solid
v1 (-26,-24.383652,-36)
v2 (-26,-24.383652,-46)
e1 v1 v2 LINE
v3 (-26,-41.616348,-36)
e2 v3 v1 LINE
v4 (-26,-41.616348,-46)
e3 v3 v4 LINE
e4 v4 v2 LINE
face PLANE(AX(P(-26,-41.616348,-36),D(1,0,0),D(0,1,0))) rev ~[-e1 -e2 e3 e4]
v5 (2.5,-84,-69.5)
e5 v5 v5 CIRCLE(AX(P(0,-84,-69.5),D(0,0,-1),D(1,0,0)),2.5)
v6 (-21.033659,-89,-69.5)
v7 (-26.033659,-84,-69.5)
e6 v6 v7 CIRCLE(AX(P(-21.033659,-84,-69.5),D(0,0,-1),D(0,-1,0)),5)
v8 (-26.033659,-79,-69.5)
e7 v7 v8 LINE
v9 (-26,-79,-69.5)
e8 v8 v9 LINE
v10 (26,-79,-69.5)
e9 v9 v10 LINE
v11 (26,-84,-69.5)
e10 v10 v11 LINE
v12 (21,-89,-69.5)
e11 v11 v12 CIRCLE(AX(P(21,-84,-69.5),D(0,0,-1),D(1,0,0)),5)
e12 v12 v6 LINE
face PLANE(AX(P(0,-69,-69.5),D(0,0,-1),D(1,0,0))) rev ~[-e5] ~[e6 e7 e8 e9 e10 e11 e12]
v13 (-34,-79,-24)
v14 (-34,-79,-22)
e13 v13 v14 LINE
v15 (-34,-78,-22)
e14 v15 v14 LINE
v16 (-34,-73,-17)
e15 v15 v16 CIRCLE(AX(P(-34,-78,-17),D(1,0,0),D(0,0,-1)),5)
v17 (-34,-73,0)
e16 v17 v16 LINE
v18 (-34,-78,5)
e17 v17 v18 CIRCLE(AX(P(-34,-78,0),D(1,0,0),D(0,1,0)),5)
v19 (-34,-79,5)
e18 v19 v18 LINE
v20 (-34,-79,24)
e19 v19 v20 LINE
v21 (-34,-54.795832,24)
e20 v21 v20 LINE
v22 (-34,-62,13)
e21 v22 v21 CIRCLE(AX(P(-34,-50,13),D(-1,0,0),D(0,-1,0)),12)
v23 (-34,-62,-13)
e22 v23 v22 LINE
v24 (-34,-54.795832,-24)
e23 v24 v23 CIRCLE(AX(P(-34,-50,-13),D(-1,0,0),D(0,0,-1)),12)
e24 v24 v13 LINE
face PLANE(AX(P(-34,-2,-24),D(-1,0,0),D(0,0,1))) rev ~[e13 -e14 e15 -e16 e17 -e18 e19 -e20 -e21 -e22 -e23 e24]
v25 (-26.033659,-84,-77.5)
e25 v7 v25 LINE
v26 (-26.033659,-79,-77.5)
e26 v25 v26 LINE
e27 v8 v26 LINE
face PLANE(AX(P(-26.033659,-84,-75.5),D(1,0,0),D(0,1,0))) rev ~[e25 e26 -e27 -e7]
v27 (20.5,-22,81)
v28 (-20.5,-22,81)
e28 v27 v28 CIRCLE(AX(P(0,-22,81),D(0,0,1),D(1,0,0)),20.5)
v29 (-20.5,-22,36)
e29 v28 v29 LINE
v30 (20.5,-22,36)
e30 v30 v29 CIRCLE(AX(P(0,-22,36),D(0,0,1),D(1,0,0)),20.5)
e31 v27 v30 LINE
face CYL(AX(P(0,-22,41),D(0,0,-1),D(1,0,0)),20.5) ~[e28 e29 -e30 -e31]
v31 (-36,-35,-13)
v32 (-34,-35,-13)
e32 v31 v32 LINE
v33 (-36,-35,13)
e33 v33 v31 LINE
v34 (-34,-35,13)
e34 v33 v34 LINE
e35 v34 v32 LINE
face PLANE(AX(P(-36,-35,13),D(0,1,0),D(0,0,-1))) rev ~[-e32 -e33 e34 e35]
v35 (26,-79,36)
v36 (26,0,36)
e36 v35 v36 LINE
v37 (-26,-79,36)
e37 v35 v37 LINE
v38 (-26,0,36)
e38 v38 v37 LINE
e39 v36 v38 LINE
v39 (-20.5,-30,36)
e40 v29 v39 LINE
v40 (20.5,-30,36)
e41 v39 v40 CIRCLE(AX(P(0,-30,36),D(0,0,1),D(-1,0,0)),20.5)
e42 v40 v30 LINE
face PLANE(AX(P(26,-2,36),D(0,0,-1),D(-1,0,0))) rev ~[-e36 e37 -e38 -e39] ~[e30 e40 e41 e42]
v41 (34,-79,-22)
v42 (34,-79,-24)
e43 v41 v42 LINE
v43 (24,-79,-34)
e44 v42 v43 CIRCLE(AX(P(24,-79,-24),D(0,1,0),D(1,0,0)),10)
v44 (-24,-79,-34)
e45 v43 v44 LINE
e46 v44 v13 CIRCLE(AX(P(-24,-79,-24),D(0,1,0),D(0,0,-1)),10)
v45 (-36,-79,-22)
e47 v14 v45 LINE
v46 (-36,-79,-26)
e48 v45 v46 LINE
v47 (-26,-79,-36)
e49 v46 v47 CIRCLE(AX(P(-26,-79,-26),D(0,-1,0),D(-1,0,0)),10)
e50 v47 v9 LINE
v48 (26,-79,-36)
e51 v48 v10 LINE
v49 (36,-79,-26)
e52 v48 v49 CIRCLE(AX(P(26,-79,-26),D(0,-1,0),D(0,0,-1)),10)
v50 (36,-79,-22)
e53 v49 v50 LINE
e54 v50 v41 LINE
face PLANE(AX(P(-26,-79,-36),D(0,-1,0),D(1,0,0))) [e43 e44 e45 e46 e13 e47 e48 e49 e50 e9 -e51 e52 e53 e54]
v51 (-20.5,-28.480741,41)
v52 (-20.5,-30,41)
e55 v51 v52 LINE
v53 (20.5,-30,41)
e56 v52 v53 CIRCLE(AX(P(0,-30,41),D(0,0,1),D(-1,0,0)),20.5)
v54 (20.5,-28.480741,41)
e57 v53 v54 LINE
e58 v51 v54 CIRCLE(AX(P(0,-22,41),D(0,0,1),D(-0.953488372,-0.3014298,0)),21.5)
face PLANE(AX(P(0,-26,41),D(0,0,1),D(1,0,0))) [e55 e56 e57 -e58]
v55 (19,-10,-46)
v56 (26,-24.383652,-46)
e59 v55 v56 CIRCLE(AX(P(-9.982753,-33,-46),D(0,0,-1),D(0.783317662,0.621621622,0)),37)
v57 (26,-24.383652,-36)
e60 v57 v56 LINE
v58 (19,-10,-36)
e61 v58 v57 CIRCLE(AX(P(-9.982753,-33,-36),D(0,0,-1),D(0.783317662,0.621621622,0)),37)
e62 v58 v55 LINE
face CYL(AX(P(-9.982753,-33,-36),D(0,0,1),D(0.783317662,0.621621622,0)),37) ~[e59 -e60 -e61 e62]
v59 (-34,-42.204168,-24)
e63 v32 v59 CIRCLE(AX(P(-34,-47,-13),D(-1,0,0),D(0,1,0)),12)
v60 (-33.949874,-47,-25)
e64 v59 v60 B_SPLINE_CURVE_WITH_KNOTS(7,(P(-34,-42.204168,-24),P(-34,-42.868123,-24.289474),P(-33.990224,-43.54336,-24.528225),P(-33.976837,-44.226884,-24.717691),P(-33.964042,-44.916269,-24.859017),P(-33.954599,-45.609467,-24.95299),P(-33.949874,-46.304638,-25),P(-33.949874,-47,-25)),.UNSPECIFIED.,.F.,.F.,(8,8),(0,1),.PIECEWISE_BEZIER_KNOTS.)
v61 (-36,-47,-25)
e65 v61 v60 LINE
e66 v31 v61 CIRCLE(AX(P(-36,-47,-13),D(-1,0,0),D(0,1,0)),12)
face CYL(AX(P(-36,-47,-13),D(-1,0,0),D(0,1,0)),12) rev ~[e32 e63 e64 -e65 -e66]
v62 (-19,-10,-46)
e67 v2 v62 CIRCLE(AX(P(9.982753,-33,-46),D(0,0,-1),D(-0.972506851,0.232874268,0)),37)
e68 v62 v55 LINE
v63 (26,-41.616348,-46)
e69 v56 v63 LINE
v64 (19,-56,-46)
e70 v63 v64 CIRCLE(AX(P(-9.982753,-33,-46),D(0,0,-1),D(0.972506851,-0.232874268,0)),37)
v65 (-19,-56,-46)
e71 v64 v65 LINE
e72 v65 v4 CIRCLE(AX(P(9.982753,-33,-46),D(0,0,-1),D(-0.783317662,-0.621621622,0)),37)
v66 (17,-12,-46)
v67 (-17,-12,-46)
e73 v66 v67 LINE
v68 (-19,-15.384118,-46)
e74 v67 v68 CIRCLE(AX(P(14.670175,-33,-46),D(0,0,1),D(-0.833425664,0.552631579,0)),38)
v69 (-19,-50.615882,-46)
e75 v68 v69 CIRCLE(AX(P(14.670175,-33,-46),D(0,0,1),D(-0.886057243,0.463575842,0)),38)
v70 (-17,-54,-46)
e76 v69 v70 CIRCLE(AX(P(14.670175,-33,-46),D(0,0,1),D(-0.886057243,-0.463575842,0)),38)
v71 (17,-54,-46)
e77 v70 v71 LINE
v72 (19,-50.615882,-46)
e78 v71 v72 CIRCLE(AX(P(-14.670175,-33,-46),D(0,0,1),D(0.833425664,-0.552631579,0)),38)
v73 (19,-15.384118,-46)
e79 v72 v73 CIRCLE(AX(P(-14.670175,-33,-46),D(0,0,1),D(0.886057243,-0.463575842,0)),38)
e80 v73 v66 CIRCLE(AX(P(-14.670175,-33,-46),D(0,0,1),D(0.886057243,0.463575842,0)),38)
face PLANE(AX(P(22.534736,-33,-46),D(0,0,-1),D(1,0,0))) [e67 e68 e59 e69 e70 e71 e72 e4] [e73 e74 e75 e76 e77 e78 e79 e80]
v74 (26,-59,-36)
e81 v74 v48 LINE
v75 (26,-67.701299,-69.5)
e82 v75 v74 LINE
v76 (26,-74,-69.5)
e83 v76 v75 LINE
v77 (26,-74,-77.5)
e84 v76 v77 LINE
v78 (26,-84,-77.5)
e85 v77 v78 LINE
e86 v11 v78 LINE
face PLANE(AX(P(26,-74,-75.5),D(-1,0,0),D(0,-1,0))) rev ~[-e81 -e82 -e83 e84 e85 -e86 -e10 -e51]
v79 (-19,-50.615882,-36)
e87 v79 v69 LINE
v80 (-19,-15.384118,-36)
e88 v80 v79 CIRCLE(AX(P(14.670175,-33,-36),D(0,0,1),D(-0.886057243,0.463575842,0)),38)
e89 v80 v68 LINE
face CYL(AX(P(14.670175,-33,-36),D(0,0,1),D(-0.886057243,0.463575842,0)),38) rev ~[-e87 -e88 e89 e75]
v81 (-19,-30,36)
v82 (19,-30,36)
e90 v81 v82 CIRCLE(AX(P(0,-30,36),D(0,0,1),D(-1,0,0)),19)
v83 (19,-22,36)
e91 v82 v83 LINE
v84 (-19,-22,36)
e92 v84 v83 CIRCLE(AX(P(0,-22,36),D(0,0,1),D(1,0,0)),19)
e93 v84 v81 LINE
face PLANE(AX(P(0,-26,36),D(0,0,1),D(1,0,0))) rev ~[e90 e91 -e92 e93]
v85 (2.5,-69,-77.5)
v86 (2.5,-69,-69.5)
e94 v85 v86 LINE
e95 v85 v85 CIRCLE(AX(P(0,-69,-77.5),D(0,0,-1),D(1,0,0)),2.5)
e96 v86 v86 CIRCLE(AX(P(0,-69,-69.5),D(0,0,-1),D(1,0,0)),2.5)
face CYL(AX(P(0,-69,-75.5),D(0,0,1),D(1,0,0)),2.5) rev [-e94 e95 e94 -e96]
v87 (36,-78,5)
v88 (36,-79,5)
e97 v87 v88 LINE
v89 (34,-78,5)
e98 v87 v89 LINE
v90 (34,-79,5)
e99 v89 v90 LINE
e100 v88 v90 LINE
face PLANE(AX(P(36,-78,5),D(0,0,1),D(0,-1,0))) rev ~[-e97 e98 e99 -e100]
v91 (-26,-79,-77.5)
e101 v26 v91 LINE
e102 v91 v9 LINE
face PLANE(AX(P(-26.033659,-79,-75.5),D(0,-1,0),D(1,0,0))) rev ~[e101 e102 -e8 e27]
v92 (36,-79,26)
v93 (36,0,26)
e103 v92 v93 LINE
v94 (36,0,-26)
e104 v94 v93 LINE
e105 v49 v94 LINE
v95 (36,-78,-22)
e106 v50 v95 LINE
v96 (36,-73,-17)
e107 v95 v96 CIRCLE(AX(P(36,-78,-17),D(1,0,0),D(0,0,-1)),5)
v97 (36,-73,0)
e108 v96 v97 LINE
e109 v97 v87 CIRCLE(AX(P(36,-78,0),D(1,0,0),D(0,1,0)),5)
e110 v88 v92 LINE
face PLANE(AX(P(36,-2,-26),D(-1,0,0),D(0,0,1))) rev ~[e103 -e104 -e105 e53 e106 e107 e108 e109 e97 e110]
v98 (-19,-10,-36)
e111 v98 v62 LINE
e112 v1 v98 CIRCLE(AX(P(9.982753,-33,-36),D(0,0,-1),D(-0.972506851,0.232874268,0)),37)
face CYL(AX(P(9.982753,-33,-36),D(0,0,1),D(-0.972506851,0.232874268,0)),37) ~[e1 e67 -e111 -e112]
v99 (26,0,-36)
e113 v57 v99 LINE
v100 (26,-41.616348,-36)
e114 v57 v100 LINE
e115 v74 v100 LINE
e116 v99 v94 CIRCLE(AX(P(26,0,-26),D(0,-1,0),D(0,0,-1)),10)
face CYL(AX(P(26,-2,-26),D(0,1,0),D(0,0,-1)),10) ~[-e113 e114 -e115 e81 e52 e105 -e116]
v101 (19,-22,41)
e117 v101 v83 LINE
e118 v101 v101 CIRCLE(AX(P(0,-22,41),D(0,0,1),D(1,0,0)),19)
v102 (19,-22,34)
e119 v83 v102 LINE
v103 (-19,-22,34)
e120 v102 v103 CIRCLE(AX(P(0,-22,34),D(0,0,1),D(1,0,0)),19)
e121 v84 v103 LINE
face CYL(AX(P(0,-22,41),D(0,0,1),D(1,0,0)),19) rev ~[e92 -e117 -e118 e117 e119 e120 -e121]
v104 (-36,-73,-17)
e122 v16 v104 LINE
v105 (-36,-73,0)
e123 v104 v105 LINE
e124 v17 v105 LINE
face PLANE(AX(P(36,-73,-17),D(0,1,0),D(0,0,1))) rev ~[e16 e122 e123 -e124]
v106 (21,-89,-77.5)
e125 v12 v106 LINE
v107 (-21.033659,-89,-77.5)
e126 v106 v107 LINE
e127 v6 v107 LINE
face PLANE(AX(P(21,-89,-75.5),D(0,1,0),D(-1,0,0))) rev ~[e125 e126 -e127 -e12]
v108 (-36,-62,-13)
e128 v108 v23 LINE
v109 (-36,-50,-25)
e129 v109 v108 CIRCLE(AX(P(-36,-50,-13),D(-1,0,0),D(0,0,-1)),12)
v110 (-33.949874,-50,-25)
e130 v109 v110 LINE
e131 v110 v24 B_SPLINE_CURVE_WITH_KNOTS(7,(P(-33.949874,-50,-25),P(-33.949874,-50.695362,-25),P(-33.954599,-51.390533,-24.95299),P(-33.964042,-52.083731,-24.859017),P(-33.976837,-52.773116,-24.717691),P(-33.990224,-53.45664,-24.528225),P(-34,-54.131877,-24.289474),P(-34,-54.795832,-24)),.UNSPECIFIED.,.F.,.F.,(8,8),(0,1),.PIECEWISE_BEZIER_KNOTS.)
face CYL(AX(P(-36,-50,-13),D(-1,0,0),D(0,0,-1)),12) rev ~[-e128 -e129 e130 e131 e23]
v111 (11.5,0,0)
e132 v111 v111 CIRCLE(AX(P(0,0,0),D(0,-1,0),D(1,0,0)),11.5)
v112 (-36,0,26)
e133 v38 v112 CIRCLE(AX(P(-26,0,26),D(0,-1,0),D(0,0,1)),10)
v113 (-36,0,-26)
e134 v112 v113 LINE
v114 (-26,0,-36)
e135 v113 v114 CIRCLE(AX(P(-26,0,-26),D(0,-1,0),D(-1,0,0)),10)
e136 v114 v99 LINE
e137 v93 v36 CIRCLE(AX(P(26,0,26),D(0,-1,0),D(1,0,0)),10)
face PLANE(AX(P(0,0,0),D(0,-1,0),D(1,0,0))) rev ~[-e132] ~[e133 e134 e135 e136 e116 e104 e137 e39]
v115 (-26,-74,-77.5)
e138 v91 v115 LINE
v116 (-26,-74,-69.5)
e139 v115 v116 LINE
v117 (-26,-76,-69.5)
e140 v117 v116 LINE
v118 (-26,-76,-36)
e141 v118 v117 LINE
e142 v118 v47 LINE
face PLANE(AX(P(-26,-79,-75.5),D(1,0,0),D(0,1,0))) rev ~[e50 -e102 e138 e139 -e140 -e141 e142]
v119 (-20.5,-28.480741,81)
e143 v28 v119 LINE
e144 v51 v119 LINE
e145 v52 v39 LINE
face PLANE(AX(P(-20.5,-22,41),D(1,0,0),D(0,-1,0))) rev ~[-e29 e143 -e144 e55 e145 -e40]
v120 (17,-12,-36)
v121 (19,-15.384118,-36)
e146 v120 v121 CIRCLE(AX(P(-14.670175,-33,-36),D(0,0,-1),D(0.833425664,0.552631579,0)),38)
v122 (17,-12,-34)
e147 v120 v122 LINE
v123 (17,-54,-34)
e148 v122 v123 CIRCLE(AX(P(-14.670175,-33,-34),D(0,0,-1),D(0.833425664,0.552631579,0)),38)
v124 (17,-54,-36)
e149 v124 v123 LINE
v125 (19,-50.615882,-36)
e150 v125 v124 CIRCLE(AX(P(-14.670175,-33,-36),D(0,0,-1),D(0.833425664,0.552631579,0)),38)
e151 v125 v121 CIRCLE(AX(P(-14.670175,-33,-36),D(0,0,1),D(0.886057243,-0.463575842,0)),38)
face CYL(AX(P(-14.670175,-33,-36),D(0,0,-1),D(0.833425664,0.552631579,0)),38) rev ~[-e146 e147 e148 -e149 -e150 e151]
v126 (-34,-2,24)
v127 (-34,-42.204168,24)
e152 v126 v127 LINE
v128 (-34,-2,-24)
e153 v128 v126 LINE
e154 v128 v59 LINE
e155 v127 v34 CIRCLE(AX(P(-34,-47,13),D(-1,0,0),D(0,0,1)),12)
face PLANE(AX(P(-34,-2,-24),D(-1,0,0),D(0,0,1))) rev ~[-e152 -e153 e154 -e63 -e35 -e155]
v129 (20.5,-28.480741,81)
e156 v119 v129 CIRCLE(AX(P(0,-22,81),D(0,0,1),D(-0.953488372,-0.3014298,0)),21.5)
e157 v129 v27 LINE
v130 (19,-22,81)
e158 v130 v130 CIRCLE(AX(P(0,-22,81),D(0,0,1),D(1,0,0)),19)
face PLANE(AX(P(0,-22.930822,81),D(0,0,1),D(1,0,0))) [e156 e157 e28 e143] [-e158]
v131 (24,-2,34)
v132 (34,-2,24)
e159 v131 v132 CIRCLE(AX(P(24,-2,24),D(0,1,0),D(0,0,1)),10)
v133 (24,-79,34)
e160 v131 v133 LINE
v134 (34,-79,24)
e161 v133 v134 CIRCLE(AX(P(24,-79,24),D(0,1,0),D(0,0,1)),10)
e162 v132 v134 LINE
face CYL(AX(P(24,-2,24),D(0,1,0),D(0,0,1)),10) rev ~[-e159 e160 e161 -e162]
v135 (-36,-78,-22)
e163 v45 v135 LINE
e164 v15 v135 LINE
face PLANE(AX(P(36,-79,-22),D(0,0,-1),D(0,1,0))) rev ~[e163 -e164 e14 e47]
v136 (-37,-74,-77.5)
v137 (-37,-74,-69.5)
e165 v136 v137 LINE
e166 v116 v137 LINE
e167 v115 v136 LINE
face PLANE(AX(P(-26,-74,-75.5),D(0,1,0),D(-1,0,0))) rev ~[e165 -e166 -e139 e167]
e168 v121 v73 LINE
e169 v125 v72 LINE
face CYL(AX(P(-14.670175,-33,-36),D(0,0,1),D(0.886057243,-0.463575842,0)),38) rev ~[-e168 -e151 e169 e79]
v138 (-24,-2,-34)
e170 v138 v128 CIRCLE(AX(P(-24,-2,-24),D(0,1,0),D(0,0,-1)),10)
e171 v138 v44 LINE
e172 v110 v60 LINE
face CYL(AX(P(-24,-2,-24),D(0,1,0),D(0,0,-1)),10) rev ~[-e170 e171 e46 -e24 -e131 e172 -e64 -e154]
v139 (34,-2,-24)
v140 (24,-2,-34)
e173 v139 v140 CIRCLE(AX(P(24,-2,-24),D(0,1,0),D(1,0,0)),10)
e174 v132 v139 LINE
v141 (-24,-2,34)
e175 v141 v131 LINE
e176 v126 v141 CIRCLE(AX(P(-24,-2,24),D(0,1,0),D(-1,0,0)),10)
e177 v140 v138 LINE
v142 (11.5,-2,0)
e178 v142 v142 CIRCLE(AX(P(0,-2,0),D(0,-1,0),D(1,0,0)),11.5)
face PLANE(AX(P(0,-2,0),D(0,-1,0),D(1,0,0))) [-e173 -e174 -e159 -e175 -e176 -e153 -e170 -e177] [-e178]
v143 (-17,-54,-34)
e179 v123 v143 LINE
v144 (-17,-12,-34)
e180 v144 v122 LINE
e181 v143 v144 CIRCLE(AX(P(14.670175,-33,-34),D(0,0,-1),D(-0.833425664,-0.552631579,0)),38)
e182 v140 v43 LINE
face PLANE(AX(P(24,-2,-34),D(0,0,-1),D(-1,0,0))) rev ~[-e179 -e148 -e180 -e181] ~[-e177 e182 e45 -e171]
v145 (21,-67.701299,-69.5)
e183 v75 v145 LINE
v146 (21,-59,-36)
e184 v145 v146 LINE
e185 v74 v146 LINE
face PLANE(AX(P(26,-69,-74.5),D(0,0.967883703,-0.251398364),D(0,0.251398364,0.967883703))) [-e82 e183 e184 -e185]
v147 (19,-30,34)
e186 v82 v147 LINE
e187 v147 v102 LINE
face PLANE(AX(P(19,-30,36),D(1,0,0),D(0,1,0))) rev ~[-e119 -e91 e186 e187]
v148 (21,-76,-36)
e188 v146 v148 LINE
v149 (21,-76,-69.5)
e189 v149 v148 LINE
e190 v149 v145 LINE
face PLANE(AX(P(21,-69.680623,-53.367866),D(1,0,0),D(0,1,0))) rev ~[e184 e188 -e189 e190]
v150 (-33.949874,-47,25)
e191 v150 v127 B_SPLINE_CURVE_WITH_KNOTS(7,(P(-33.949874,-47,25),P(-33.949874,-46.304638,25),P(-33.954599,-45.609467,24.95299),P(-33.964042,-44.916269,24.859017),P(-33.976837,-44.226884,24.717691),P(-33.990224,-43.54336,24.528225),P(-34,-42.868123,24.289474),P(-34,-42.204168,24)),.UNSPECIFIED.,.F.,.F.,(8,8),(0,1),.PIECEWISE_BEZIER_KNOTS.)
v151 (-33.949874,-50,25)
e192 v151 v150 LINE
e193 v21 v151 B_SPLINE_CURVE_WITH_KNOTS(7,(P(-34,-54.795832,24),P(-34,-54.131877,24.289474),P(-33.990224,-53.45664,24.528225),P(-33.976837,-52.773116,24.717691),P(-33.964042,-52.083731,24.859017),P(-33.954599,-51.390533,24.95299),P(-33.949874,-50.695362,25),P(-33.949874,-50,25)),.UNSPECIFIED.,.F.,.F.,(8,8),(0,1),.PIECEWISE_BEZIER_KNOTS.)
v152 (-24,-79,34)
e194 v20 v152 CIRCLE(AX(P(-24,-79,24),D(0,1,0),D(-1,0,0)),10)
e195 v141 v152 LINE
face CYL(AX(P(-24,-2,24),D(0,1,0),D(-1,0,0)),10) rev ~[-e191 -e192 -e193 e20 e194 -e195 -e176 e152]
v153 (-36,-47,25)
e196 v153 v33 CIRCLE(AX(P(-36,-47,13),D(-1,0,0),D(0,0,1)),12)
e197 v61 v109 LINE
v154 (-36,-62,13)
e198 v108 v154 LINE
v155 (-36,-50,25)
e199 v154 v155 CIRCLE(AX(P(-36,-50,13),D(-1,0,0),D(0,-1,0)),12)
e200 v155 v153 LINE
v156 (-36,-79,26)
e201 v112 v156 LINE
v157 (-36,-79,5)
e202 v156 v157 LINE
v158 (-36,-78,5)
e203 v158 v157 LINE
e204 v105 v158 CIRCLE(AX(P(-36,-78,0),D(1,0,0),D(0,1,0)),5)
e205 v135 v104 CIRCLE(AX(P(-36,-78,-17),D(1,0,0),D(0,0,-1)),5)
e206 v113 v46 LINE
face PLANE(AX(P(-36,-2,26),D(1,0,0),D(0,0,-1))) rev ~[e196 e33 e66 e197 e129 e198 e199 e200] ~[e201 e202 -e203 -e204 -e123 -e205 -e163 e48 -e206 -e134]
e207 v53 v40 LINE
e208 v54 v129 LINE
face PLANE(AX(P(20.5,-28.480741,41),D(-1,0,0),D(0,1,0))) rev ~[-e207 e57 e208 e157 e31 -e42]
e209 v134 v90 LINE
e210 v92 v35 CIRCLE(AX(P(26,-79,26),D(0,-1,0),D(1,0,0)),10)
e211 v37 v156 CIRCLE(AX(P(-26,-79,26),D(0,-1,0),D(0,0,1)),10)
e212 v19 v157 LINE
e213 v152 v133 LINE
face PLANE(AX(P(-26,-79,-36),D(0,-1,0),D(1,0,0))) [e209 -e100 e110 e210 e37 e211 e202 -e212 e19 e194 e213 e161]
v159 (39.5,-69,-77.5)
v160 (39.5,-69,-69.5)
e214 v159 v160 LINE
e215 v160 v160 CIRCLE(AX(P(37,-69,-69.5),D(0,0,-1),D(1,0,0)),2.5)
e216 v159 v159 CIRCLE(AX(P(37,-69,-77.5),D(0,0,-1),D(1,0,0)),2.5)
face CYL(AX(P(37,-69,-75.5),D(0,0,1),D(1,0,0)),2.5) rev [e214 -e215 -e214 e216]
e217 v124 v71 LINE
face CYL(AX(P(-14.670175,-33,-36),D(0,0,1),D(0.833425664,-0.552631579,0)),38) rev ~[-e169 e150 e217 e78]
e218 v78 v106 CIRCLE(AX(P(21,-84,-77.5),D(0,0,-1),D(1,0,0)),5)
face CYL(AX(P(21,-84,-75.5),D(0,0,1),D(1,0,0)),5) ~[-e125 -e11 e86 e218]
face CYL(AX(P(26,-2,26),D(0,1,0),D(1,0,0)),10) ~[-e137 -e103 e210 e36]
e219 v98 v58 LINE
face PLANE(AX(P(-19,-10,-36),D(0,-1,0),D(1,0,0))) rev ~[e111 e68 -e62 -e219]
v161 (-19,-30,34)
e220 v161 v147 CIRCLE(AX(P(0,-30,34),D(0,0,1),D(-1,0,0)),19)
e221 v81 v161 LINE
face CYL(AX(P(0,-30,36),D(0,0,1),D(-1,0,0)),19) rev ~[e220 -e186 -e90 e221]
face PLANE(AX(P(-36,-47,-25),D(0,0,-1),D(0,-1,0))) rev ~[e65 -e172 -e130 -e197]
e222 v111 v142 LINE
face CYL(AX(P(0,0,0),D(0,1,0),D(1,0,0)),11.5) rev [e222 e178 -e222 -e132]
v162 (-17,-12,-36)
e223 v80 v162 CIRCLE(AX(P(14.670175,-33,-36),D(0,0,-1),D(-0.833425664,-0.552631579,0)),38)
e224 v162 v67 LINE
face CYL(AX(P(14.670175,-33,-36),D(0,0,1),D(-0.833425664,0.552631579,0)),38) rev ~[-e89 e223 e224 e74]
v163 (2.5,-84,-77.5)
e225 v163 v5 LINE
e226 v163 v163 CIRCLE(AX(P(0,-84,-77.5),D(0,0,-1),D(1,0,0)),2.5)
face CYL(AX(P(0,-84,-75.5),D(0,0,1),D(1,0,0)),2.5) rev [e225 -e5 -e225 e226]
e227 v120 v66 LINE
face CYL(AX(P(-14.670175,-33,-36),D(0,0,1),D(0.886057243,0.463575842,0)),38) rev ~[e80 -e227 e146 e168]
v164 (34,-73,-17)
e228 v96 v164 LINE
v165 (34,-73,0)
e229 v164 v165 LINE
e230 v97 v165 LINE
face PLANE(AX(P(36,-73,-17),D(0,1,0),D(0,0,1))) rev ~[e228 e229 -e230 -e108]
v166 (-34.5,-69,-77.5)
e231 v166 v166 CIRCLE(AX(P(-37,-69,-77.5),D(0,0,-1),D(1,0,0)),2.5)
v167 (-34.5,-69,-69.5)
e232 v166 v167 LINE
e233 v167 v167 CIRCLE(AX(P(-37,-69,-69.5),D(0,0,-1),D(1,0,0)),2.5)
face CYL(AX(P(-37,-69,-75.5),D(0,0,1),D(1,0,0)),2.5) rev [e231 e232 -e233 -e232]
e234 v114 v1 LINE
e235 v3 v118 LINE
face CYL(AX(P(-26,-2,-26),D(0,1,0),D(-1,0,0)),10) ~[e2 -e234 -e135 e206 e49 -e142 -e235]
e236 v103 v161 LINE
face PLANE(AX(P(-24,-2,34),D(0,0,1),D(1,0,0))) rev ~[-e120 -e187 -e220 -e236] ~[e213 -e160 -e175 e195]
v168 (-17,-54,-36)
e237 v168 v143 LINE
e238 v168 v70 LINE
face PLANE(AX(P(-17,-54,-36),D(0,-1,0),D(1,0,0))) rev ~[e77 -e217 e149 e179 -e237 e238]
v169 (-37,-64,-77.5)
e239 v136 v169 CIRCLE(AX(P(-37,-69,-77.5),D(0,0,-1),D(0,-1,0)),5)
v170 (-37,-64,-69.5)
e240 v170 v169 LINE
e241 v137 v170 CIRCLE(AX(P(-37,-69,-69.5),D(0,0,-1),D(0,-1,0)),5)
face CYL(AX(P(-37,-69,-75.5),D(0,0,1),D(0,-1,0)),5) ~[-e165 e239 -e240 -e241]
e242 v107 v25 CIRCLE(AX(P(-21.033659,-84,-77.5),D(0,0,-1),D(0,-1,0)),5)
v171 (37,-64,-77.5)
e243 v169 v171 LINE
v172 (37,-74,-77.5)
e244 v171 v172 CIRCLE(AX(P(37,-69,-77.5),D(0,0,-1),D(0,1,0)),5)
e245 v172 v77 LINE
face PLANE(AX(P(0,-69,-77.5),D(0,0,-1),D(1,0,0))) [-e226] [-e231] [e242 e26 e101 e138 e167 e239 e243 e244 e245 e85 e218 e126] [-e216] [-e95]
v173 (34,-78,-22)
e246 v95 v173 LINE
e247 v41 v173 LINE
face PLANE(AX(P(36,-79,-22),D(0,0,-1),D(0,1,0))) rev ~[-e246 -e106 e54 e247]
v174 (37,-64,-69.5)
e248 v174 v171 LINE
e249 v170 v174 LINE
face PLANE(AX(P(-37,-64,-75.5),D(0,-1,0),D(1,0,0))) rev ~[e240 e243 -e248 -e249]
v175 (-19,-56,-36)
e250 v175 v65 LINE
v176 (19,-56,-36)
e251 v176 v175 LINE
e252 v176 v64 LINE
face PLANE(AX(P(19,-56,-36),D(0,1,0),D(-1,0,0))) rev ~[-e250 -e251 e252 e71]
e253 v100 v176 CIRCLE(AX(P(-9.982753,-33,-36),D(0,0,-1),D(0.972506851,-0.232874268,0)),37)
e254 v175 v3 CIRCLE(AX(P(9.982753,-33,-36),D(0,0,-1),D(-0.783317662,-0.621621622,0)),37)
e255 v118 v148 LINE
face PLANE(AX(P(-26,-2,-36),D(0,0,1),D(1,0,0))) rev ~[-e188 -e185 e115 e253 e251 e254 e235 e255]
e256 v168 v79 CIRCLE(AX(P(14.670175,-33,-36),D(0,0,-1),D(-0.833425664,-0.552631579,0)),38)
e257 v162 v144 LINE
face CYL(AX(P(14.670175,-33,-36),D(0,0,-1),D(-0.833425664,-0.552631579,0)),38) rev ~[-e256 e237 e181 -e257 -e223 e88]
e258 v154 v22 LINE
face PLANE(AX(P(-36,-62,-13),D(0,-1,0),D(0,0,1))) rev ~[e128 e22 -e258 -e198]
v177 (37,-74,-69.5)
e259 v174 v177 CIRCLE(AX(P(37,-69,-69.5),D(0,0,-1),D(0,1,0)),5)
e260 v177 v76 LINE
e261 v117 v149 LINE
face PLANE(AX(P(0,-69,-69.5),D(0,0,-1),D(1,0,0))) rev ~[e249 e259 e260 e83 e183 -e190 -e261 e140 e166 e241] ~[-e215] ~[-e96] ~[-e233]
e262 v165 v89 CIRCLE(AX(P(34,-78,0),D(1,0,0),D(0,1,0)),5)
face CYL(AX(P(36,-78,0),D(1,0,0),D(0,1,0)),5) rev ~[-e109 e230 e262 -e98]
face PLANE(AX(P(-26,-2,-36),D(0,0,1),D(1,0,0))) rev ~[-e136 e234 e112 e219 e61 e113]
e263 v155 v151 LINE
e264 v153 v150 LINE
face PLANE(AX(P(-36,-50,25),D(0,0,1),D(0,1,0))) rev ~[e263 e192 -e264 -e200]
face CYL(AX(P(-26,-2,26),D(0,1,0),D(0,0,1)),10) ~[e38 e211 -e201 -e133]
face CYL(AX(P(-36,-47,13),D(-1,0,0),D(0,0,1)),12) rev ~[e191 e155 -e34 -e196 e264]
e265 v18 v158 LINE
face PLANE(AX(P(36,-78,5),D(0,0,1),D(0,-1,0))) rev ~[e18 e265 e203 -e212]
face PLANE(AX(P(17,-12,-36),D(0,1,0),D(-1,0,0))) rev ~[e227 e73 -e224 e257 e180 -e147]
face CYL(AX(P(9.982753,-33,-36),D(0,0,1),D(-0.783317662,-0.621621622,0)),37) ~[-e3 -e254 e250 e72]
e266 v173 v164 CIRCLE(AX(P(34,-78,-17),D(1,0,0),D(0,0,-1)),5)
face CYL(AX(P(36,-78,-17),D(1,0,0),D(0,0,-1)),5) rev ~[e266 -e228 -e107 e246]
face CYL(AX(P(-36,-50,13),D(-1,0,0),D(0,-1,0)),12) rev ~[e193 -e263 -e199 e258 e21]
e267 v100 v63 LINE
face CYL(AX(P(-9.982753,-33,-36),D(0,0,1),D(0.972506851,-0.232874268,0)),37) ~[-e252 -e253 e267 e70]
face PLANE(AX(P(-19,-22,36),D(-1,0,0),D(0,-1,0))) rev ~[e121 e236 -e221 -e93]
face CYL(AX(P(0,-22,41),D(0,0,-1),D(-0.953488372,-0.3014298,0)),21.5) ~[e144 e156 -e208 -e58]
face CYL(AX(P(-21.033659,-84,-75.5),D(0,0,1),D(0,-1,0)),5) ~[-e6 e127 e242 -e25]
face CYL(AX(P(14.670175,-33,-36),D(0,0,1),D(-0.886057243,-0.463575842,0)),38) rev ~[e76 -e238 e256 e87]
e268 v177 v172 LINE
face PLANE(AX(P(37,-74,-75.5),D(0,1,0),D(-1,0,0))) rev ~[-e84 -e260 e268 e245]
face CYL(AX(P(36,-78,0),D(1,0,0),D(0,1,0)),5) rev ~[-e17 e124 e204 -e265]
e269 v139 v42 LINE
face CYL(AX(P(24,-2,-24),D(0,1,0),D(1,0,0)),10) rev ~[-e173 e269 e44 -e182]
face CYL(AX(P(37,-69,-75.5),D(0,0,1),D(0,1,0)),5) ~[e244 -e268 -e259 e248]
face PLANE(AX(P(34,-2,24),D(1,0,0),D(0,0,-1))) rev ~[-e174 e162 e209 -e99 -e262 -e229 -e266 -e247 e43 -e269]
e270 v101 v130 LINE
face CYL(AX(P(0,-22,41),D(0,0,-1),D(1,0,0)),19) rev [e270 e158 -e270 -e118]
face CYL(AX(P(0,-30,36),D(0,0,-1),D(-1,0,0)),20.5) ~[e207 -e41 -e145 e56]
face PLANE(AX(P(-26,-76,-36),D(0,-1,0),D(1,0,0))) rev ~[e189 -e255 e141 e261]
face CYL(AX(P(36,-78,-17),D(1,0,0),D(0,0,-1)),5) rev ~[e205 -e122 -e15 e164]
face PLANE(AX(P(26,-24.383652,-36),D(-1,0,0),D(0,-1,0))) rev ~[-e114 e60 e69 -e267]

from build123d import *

# Parameters (mm, degrees)
F0_R      = 11.5
F1_DEPTH  = 2
F3_DEPTH  = 77
F5_DEPTH  = 3
F7_DEPTH  = 3
F9_DEPTH  = 5
F11_DEPTH = 3
F12_R     = 19
F13_DEPTH = 8
F14_R     = 19
F15_DEPTH = 40
F16_W     = 52
F16_H     = 3
F17_DEPTH = 38.5
F19_DEPTH = 3
F21_DEPTH = 10
F22_W     = 3
F22_H     = 38.5
F23_DEPTH = 5
F25_R     = 2.5
F25_W     = 47
F25_H     = 2
F26_DEPTH = 5
F27_DEPTH = 1
F29_DEPTH = 75
F30_DEPTH = 2


with BuildPart() as f1:
    # F0 (on Front) → F1 (new body)
    with BuildSketch(Plane.XZ):
        with BuildLine():
            Line((26, 36), (-26, 36))
            ThreePointArc((-26, 36), (-33.0710678119, 33.0710678119), (-36, 26))
            Line((-36, 26), (-36, -26))
            ThreePointArc((-36, -26), (-33.0710678119, -33.0710678119), (-26, -36))
            Line((-26, -36), (26, -36))
            ThreePointArc((26, -36), (33.0710678119, -33.0710678119), (36, -26))
            Line((36, -26), (36, 26))
            ThreePointArc((36, 26), (33.0710678119, 33.0710678119), (26, 36))
        make_face()
        with BuildLine():
            Line((24, -34), (-24, -34))
            ThreePointArc((-24, -34), (-31.0710678119, -31.0710678119), (-34, -24))
            Line((-34, -24), (-34, 24))
            ThreePointArc((-34, 24), (-31.0710678119, 31.0710678119), (-24, 34))
            Line((-24, 34), (24, 34))
            ThreePointArc((24, 34), (31.0710678119, 31.0710678119), (34, 24))
            Line((34, 24), (34, -24))
            ThreePointArc((34, -24), (31.0710678119, -31.0710678119), (24, -34))
        make_face(mode=Mode.SUBTRACT)
        with BuildLine():
            ThreePointArc((-34, -24), (-31.0710678119, -31.0710678119), (-24, -34))
            Line((-24, -34), (24, -34))
            ThreePointArc((24, -34), (31.0710678119, -31.0710678119), (34, -24))
            Line((34, -24), (34, 24))
            ThreePointArc((34, 24), (31.0710678119, 31.0710678119), (24, 34))
            Line((24, 34), (-24, 34))
            ThreePointArc((-24, 34), (-31.0710678119, 31.0710678119), (-34, 24))
            Line((-34, 24), (-34, -24))
        make_face()
        Circle(F0_R, mode=Mode.SUBTRACT)
    extrude(amount=F1_DEPTH)

    # F2 (on face) → F3 (join)
    with BuildSketch(Plane.XZ.offset(2)):
        with BuildLine():
            Line((26, 36), (-26, 36))
            ThreePointArc((-26, 36), (-33.0710678119, 33.0710678119), (-36, 26))
            Line((-36, 26), (-36, -26))
            ThreePointArc((-36, -26), (-33.0710678119, -33.0710678119), (-26, -36))
            Line((-26, -36), (26, -36))
            ThreePointArc((26, -36), (33.0710678119, -33.0710678119), (36, -26))
            Line((36, -26), (36, 26))
            ThreePointArc((36, 26), (33.0710678119, 33.0710678119), (26, 36))
        make_face()
        with BuildLine():
            Line((24, -34), (-24, -34))
            ThreePointArc((-24, -34), (-31.0710678119, -31.0710678119), (-34, -24))
            Line((-34, -24), (-34, 24))
            ThreePointArc((-34, 24), (-31.0710678119, 31.0710678119), (-24, 34))
            Line((-24, 34), (24, 34))
            ThreePointArc((24, 34), (31.0710678119, 31.0710678119), (34, 24))
            Line((34, 24), (34, -24))
            ThreePointArc((34, -24), (31.0710678119, -31.0710678119), (24, -34))
        make_face(mode=Mode.SUBTRACT)
    extrude(amount=F3_DEPTH)

    # F4 (on face) → F5 (cut)
    with BuildSketch(Plane(origin=(-36, 0, 0), x_dir=(0, -1, 0), z_dir=(-1, 0, 0))):
        with BuildLine():
            ThreePointArc((62, 13), (58.4852813742, 21.4852813742), (50, 25))
            Line((50, 25), (47, 25))
            ThreePointArc((47, 25), (38.5147186258, 21.4852813742), (35, 13))
            Line((35, 13), (35, -13))
            ThreePointArc((35, -13), (38.5147186258, -21.4852813742), (47, -25))
            Line((47, -25), (50, -25))
            ThreePointArc((50, -25), (58.4852813742, -21.4852813742), (62, -13))
            Line((62, -13), (62, 13))
        make_face()
    extrude(amount=-F5_DEPTH, mode=Mode.SUBTRACT)

    # F6 (on face) → F7 (cut)
    with BuildSketch(Plane.XY.offset(36)):
        with BuildLine():
            Line((19, -30), (19, -22))
            ThreePointArc((19, -22), (0, -3), (-19, -22))
            Line((-19, -22), (-19, -30))
            ThreePointArc((-19, -30), (0, -49), (19, -30))
        make_face()
    extrude(amount=-F7_DEPTH, mode=Mode.SUBTRACT)

    # F8 (on face) → F9 (join)
    with BuildSketch(Plane.XY.offset(36)):
        with BuildLine():
            Line((-20.5, -22), (-20.5, -30))
            ThreePointArc((-20.5, -30), (0, -50.5), (20.5, -30))
            Line((20.5, -30), (20.5, -22))
            ThreePointArc((20.5, -22), (0, -1.5), (-20.5, -22))
        make_face()
        with BuildLine():
            ThreePointArc((-19, -22), (0, -3), (19, -22))
            Line((19, -22), (19, -22.3025978408))
            Line((19, -22.3025978408), (19, -29.6974021592))
            Line((19, -29.6974021592), (19, -30))
            ThreePointArc((19, -30), (0, -49), (-19, -30))
            Line((-19, -30), (-19, -22))
        make_face(mode=Mode.SUBTRACT)
        with BuildLine():
            Line((19, -22.3025978408), (19, -22))
            ThreePointArc((19, -22), (0, -3), (-19, -22))
            Line((-19, -22), (-19, -30))
            ThreePointArc((-19, -30), (0, -49), (19, -30))
            Line((19, -30), (19, -29.6974021592))
            Line((19, -29.6974021592), (19, -22.3025978408))
        make_face()
    extrude(amount=F9_DEPTH)

    # F10 (on face) → F11 (join)
    with BuildSketch(Plane.XY.offset(36)):
        with BuildLine():
            Line((20.5, -30), (20.5, -22))
            ThreePointArc((20.5, -22), (0, -1.5), (-20.5, -22))
            Line((-20.5, -22), (-20.5, -30))
            ThreePointArc((-20.5, -30), (0, -50.5), (20.5, -30))
        make_face()
    extrude(amount=F11_DEPTH)

    # F12 (on face) → F13 (cut)
    with BuildSketch(Plane.XY.offset(41)):
        with Locations((0, -22)):
            Circle(F12_R)
    extrude(amount=-F13_DEPTH, mode=Mode.SUBTRACT)

    # F14 (on face) → F15 (join)
    with BuildSketch(Plane.XY.offset(41)):
        with BuildLine():
            Line((-20.5, -22), (-20.5, -28.4807406984))
            ThreePointArc((-20.5, -28.4807406984), (0, -43.5), (20.5, -28.4807406984))
            Line((20.5, -28.4807406984), (20.5, -22))
            ThreePointArc((20.5, -22), (0, -1.5), (-20.5, -22))
        make_face()
        with Locations((0, -22)):
            Circle(F14_R, mode=Mode.SUBTRACT)
    extrude(amount=F15_DEPTH)

    # F16 (on face) → F17 (join)
    with BuildSketch(Plane(origin=(0, 0, -36), x_dir=(1, 0, 0), z_dir=(0, 0, -1))):
        with Locations((0, 77.5)):
            Rectangle(F16_W, F16_H)
    extrude(amount=F17_DEPTH)

    # F18 (on face) → F19 (cut)
    with BuildSketch(Plane(origin=(0, 0, -36), x_dir=(1, 0, 0), z_dir=(0, 0, -1))):
        with BuildLine():
            Line((-17, 12), (17, 12))
            ThreePointArc((17, 12), (23.3298247558, 33), (17, 54))
            Line((17, 54), (-17, 54))
            ThreePointArc((-17, 54), (-23.3298247558, 33), (-17, 12))
        make_face()
    extrude(amount=-F19_DEPTH, mode=Mode.SUBTRACT)

    # F20 (on face) → F21 (join)
    with BuildSketch(Plane(origin=(0, 0, -36), x_dir=(1, 0, 0), z_dir=(0, 0, -1))):
        with BuildLine():
            ThreePointArc((19, 50.6158820109), (23.3298247558, 33), (19, 15.3841179891))
            Line((19, 15.3841179891), (19, 10))
            ThreePointArc((19, 10), (23.2866263695, 16.8090036252), (26, 24.3836521016))
            Line((26, 24.3836521016), (26, 41.6163478984))
            ThreePointArc((26, 41.6163478984), (23.2866263695, 49.1909963748), (19, 56))
            Line((19, 56), (19, 50.6158820109))
        make_face()
        with BuildLine():
            Line((-19, 56), (-19, 50.6158820109))
            ThreePointArc((-19, 50.6158820109), (-18.0437883513, 52.3338197434), (-17, 54))
            Line((-17, 54), (17, 54))
            ThreePointArc((17, 54), (18.0437883513, 52.3338197434), (19, 50.6158820109))
            Line((19, 50.6158820109), (19, 56))
            Line((19, 56), (-19, 56))
        make_face()
        with BuildLine():
            Line((-19, 10), (-19, 15.3841179891))
            ThreePointArc((-19, 15.3841179891), (-23.3298247558, 33), (-19, 50.6158820109))
            Line((-19, 50.6158820109), (-19, 56))
            ThreePointArc((-19, 56), (-23.2866263695, 49.1909963748), (-26, 41.6163478984))
            Line((-26, 41.6163478984), (-26, 24.3836521016))
            ThreePointArc((-26, 24.3836521016), (-23.2866263695, 16.8090036252), (-19, 10))
        make_face()
        with BuildLine():
            Line((17, 12), (-17, 12))
            ThreePointArc((-17, 12), (-18.0437883513, 13.6661802566), (-19, 15.3841179891))
            Line((-19, 15.3841179891), (-19, 10))
            Line((-19, 10), (19, 10))
            Line((19, 10), (19, 15.3841179891))
            ThreePointArc((19, 15.3841179891), (18.0437883513, 13.6661802566), (17, 12))
        make_face()
    extrude(amount=F21_DEPTH)

    # F22 (on face) → F23 (join)
    with BuildSketch(Plane.YZ.offset(26)):
        Polygon((-76, -36), (-76, -74.5), (-69, -74.5), (-59, -36), align=None)
        with Locations((-77.5, -55.25)):
            Rectangle(F22_W, F22_H)
    extrude(amount=-F23_DEPTH)

    # F25 (on face) → F26 (join)
    with BuildSketch(Plane(origin=(0, 0, -74.5), x_dir=(1, 0, 0), z_dir=(0, 0, -1))):
        with BuildLine():
            Line((37, 74), (26, 74))
            Line((26, 74), (21, 74))
            Line((21, 74), (-26, 74))
            Line((-26, 74), (-37, 74))
            ThreePointArc((-37, 74), (-42, 69), (-37, 64))
            Line((-37, 64), (37, 64))
            ThreePointArc((37, 64), (42, 69), (37, 74))
        make_face()
        with Locations((-37, 69)):
            Circle(F25_R, mode=Mode.SUBTRACT)
        with Locations((0, 69)):
            Circle(F25_R, mode=Mode.SUBTRACT)
        with Locations((37, 69)):
            Circle(F25_R, mode=Mode.SUBTRACT)
        Polygon((26, 79), (-26, 79), (-26, 76), (21, 76), (21, 74), (26, 74), align=None)
        with Locations((-2.5, 75)):
            Rectangle(F25_W, F25_H)
        with BuildLine():
            Line((-26.0336585343, 79), (-26, 79))
            Line((-26, 79), (26, 79))
            Line((26, 79), (26, 84))
            ThreePointArc((26, 84), (24.5355339059, 87.5355339059), (21, 89))
            Line((21, 89), (-21.0336585343, 89))
            ThreePointArc((-21.0336585343, 89), (-24.5691924402, 87.5355339059), (-26.0336585343, 84))
            Line((-26.0336585343, 84), (-26.0336585343, 79))
        make_face()
        with Locations((0, 84)):
            Circle(F25_R, mode=Mode.SUBTRACT)
    extrude(amount=-F26_DEPTH)

    # F27 (add): faces of the model
    f27_faces = [f1.faces().sort_by_distance(p)[0] for p in [
        (23.5, -77.5, -74.5),
        (-2.5, -77.5, -74.5),
        (23.5, -72.5, -74.5),
        (-26.0168292671, -79.5298586246, -74.5),
        (-41.1514718626, -69, -74.5),
    ]]
    extrude(f27_faces, amount=F27_DEPTH)

    # F28 (on face) → F29 (cut)
    with BuildSketch(Plane.YZ.offset(36)):
        with BuildLine():
            Line((-78, 5), (-79, 5))
            Line((-79, 5), (-79, -22))
            Line((-79, -22), (-78, -22))
            ThreePointArc((-78, -22), (-74.4644660941, -20.5355339059), (-73, -17))
            Line((-73, -17), (-73, 0))
            ThreePointArc((-73, 0), (-74.4644660941, 3.5355339059), (-78, 5))
        make_face()
    extrude(amount=-F29_DEPTH, mode=Mode.SUBTRACT)

    # F30 (add): a face of the model
    f30_faces = [f1.faces().sort_by_distance(p)[0] for p in [
        (-0.0056811519, -75.1326620312, -75.5),
    ]]
    extrude(f30_faces, amount=F30_DEPTH)


solid = f1.part
